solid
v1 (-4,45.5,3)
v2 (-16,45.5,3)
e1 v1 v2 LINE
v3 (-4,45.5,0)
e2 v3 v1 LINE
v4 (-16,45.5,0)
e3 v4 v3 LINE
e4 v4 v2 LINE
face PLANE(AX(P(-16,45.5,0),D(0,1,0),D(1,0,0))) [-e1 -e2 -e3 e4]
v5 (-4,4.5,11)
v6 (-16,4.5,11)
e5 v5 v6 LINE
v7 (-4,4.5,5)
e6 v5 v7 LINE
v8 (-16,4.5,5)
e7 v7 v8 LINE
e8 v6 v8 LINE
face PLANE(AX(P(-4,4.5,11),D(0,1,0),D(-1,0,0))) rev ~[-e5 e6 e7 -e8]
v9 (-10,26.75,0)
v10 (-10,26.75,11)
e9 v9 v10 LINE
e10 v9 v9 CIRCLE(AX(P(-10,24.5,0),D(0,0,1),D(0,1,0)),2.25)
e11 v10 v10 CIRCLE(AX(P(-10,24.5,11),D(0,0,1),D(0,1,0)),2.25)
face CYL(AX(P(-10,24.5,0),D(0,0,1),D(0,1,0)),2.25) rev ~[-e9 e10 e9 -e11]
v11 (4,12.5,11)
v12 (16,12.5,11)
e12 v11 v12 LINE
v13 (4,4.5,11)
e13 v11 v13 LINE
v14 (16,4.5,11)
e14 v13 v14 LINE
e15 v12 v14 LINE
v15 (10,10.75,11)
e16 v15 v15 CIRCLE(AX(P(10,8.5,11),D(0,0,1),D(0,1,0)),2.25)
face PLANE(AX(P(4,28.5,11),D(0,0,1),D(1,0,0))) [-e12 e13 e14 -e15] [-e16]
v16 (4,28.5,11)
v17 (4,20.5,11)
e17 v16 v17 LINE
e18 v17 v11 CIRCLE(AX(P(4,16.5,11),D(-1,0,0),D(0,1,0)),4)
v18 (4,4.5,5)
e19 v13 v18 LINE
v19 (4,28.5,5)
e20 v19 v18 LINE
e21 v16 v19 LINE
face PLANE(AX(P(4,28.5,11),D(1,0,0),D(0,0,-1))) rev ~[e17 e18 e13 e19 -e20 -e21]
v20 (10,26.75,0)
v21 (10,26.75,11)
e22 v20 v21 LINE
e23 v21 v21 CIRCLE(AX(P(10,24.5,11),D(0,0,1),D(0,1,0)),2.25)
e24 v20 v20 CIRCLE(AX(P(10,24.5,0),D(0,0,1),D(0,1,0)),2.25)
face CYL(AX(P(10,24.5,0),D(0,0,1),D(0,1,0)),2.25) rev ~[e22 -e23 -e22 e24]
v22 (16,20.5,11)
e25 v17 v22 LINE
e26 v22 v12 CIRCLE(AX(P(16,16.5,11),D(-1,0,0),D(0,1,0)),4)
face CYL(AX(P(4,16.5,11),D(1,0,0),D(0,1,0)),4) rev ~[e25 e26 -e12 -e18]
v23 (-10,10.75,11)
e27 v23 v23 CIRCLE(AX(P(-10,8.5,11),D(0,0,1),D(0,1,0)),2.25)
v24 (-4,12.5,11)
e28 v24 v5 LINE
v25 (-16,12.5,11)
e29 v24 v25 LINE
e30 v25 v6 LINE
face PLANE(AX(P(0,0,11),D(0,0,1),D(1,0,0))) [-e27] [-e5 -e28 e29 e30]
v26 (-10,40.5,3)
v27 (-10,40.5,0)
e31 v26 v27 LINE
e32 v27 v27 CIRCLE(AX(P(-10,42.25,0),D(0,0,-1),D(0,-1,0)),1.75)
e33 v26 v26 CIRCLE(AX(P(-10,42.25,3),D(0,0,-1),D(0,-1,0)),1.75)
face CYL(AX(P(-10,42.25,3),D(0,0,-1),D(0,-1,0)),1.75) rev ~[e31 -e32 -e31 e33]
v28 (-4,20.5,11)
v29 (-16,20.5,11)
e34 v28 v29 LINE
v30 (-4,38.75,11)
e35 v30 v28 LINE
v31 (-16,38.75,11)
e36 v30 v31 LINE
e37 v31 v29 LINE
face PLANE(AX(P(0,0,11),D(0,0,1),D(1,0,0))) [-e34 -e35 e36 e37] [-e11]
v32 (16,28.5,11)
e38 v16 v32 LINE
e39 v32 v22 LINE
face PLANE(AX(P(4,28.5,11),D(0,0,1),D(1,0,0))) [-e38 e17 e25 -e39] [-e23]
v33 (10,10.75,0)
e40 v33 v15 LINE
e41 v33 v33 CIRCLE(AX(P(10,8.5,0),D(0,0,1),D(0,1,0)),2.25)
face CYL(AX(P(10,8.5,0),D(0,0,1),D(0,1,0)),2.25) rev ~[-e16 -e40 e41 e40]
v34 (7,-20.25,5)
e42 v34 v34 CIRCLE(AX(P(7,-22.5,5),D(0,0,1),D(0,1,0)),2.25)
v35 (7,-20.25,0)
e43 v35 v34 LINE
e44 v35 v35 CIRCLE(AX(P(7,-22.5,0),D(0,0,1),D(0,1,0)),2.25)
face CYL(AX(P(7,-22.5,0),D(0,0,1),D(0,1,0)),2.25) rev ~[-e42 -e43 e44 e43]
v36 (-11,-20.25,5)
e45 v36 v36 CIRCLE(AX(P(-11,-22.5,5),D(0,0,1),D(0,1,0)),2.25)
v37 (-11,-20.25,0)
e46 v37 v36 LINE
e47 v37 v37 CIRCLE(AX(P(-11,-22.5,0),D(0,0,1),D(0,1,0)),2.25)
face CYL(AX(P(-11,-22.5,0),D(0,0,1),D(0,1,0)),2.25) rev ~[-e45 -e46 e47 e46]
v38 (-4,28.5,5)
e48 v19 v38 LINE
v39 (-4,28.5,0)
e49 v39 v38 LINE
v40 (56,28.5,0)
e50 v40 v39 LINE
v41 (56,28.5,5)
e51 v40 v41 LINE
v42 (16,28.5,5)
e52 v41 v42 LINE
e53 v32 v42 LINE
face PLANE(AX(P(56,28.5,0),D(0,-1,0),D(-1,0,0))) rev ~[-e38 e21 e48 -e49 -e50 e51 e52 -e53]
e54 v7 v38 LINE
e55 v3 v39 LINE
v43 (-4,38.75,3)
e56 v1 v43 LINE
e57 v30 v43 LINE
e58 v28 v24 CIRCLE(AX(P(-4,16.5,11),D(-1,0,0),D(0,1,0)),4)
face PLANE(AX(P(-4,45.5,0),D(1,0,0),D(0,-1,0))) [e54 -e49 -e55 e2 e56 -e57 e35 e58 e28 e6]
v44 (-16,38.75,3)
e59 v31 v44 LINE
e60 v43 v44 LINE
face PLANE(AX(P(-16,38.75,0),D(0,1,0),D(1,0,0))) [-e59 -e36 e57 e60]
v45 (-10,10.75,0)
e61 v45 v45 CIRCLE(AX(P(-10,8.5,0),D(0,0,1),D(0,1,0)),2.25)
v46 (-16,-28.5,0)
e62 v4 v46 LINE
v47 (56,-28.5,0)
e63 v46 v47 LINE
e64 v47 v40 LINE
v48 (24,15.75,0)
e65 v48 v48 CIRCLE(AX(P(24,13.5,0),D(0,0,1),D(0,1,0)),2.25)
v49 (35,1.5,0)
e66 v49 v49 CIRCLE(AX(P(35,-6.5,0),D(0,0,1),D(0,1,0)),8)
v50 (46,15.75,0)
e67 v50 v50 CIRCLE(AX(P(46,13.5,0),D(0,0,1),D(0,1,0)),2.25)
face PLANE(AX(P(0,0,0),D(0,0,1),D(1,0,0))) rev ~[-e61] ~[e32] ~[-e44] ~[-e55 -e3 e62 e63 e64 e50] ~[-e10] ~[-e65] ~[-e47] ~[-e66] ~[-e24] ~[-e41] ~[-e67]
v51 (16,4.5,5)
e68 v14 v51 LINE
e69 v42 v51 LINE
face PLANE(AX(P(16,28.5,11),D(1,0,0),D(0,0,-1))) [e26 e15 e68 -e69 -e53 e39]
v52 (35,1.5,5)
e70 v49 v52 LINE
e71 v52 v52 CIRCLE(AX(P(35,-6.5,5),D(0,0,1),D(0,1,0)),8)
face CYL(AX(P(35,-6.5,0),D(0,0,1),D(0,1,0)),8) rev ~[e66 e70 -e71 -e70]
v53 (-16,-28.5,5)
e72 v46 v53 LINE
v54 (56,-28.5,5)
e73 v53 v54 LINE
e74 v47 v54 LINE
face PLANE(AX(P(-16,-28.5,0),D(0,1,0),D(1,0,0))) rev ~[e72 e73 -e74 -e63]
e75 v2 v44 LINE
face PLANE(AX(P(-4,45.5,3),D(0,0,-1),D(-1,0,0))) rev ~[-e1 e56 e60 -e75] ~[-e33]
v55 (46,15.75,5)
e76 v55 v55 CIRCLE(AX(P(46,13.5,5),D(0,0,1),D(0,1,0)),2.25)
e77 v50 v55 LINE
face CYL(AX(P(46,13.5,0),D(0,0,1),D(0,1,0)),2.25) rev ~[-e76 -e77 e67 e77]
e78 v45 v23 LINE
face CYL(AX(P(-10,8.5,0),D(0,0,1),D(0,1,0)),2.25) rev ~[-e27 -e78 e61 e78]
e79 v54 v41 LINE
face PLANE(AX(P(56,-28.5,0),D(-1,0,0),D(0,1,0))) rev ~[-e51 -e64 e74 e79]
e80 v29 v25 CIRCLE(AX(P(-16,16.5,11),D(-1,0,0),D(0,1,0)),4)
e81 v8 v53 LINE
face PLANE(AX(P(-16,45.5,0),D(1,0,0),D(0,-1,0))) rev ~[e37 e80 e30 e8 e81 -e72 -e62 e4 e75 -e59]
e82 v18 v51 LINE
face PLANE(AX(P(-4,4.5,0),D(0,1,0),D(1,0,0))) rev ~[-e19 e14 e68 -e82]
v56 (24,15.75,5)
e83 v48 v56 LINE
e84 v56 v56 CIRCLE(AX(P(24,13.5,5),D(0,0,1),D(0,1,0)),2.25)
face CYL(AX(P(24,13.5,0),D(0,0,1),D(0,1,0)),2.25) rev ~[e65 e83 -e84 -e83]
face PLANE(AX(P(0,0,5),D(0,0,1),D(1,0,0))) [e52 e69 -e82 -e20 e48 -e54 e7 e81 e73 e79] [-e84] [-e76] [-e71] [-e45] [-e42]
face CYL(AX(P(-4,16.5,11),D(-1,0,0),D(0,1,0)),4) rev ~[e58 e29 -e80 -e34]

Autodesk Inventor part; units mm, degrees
ref_plane "YZ Plane" through (0, 0, 0) normal (1, 0, 0) x (0, 1, 0)
ref_plane "XZ Plane" through (0, 0, 0) normal (0, 1, 0) x (-1, 0, 0)
ref_plane "XY Plane" through (0, 0, 0) normal (0, 0, 1) x (1, 0, 0)
sketch "Sketch1" plane through (0, 0, 0) normal (0, 0, 1) x (1, 0, 0)
  line L0 (-16, 45.5) -> (-4, 45.5)
  line L1 (-16, 45.5) -> (-16, -28.5)
  line L2 (-16, -28.5) -> (56, -28.5)
  line L3 (56, 28.5) -> (-4, 28.5)
  line L4 (56, -28.5) -> (56, 28.5)
  line L5 (-4, 45.5) -> (-4, 28.5)
extrude "Extrusion4" add sketch "Sketch1" along normal blind 11
sketch "Sketch2" plane through (0, 0, 11) normal (0, 0, 1) x (1, 0, 0)
  line L0 (56, -28.5) -> (56, 28.5)
  line L1 (-4, 4.5) -> (-16, 4.5)
  line L2 (-4, 4.5) -> (-4, 28.5)
  line L3 (-16, 4.5) -> (-16, -28.5)
  line L4 (-16, -28.5) -> (56, -28.5)
  line L5 (56, 28.5) -> (-4, 28.5)
extrude "Extrusion3" cut sketch "Sketch2" against normal blind 6 draft 0
sketch "Sketch3" plane through (-4, 28.5, 0) normal (0, 1, 0) x (1, 0, 0)
  line L0 (20, -11) -> (20, -5)
  line L1 (8, -5) -> (20, -5)
  line L2 (8, -11) -> (20, -11)
  line L3 (8, -11) -> (8, -5)
extrude "Extrusion2" add sketch "Sketch3" against normal blind 24
sketch "Sketch4" plane through (-16, 45.5, 0) normal (0, 1, 0) x (1, 0, 0)
  line L0 (12, -11) -> (0, -11)
  line L1 (0, -11) -> (0, -3)
  line L2 (12, -11) -> (12, -3)
  line L3 (12, -3) -> (0, -3)
extrude "Extrusion1" cut sketch "Sketch4" against normal blind 6.75
hole "Hole10" at (-10, 42.25, 3) direction (0, 0, -1) diameter 3.5 depth 3
hole "Hole9" at (24, 13.5, 0) direction (0, 0, 1) diameter 4.5 depth 5
hole "Hole8" at (46, 13.5, 0) direction (0, 0, 1) diameter 4.5 depth 5
hole "Hole7" at (7, -22.5, 0) direction (0, 0, 1) diameter 4.5 depth 5
hole "Hole6" at (-11, -22.5, 0) direction (0, 0, 1) diameter 4.5 depth 5
sketch "Sketch9" plane through (0, 0, 0) normal (0, 0, 1) x (1, 0, 0)
  point P0 (-11, -22.5)
hole "Hole5" at (35, -6.5, 0) direction (0, 0, 1) diameter 16 depth 5
sketch "Sketch8" plane through (0, 0, 0) normal (0, 0, 1) x (1, 0, 0)
  point P0 (7, -22.5)
hole "Hole4" at (10, 8.5, 0) direction (0, 0, 1) diameter 4.5 depth 11
sketch "Sketch7" plane through (0, 0, 0) normal (0, 0, 1) x (1, 0, 0)
  point P0 (46, 13.5)
hole "Hole3" at (10, 24.5, 0) direction (0, 0, 1) diameter 4.5 depth 11
sketch "Sketch6" plane through (0, 0, 0) normal (0, 0, 1) x (1, 0, 0)
  point P0 (24, 13.5)
hole "Hole2" at (-10, 8.5, 0) direction (0, 0, 1) diameter 4.5 depth 11
sketch "Sketch5" plane through (-16, 45.5, 3) normal (0, 0, 1) x (1, 0, 0)
  point P0 (6, -3.25)
hole "Hole1" at (-10, 24.5, 0) direction (0, 0, 1) diameter 4.5 depth 11
sketch "Sketch15" plane through (0, 0, 11) normal (0, 0, 1) x (1, 0, 0)
  line L0 (4, 20.5) -> (16, 20.5)
  line L1 (4, 20.5) -> (4, 16.5)
  line L2 (16, 20.5) -> (16, 16.5)
  line L3 (4, 16.5) -> (16, 16.5)
  line L4 (4, 16.5) -> (14, 16.5)
revolve "Revolution2" cut sketch "Sketch15" angle 180 about axis through (4, 16.5, 11) along (-1, 0, 0)
sketch "Sketch16" plane through (4, 28.5, 11) normal (0, 0, 1) x (1, 0, 0)
  line L0 (-8, -8) -> (-20, -8)
  line L1 (-8, -8) -> (-8, -12)
  line L2 (-20, -8) -> (-20, -12)
  line L3 (-8, -12) -> (-20, -12)
  line L4 (-8, -12) -> (-18, -12)
revolve "Revolution1" cut sketch "Sketch16" angle 180 about axis through (-4, 16.5, 11) along (-1, 0, 0)
sketch "Sketch10" plane through (0, 0, 0) normal (0, 0, 1) x (1, 0, 0)
  point P0 (35, -6.5)
sketch "Sketch11" plane through (0, 0, 0) normal (0, 0, 1) x (1, 0, 0)
  point P0 (10, 8.5)
sketch "Sketch12" plane through (0, 0, 0) normal (0, 0, 1) x (1, 0, 0)
  point P0 (10, 24.5)
sketch "Sketch13" plane through (0, 0, 0) normal (0, 0, 1) x (1, 0, 0)
  point P0 (-10, 8.5)
sketch "Sketch14" plane through (0, 0, 0) normal (0, 0, 1) x (1, 0, 0)
  point P0 (-10, 24.5)
properties part number "X-axis driver holder" material "ABS Plastic"
